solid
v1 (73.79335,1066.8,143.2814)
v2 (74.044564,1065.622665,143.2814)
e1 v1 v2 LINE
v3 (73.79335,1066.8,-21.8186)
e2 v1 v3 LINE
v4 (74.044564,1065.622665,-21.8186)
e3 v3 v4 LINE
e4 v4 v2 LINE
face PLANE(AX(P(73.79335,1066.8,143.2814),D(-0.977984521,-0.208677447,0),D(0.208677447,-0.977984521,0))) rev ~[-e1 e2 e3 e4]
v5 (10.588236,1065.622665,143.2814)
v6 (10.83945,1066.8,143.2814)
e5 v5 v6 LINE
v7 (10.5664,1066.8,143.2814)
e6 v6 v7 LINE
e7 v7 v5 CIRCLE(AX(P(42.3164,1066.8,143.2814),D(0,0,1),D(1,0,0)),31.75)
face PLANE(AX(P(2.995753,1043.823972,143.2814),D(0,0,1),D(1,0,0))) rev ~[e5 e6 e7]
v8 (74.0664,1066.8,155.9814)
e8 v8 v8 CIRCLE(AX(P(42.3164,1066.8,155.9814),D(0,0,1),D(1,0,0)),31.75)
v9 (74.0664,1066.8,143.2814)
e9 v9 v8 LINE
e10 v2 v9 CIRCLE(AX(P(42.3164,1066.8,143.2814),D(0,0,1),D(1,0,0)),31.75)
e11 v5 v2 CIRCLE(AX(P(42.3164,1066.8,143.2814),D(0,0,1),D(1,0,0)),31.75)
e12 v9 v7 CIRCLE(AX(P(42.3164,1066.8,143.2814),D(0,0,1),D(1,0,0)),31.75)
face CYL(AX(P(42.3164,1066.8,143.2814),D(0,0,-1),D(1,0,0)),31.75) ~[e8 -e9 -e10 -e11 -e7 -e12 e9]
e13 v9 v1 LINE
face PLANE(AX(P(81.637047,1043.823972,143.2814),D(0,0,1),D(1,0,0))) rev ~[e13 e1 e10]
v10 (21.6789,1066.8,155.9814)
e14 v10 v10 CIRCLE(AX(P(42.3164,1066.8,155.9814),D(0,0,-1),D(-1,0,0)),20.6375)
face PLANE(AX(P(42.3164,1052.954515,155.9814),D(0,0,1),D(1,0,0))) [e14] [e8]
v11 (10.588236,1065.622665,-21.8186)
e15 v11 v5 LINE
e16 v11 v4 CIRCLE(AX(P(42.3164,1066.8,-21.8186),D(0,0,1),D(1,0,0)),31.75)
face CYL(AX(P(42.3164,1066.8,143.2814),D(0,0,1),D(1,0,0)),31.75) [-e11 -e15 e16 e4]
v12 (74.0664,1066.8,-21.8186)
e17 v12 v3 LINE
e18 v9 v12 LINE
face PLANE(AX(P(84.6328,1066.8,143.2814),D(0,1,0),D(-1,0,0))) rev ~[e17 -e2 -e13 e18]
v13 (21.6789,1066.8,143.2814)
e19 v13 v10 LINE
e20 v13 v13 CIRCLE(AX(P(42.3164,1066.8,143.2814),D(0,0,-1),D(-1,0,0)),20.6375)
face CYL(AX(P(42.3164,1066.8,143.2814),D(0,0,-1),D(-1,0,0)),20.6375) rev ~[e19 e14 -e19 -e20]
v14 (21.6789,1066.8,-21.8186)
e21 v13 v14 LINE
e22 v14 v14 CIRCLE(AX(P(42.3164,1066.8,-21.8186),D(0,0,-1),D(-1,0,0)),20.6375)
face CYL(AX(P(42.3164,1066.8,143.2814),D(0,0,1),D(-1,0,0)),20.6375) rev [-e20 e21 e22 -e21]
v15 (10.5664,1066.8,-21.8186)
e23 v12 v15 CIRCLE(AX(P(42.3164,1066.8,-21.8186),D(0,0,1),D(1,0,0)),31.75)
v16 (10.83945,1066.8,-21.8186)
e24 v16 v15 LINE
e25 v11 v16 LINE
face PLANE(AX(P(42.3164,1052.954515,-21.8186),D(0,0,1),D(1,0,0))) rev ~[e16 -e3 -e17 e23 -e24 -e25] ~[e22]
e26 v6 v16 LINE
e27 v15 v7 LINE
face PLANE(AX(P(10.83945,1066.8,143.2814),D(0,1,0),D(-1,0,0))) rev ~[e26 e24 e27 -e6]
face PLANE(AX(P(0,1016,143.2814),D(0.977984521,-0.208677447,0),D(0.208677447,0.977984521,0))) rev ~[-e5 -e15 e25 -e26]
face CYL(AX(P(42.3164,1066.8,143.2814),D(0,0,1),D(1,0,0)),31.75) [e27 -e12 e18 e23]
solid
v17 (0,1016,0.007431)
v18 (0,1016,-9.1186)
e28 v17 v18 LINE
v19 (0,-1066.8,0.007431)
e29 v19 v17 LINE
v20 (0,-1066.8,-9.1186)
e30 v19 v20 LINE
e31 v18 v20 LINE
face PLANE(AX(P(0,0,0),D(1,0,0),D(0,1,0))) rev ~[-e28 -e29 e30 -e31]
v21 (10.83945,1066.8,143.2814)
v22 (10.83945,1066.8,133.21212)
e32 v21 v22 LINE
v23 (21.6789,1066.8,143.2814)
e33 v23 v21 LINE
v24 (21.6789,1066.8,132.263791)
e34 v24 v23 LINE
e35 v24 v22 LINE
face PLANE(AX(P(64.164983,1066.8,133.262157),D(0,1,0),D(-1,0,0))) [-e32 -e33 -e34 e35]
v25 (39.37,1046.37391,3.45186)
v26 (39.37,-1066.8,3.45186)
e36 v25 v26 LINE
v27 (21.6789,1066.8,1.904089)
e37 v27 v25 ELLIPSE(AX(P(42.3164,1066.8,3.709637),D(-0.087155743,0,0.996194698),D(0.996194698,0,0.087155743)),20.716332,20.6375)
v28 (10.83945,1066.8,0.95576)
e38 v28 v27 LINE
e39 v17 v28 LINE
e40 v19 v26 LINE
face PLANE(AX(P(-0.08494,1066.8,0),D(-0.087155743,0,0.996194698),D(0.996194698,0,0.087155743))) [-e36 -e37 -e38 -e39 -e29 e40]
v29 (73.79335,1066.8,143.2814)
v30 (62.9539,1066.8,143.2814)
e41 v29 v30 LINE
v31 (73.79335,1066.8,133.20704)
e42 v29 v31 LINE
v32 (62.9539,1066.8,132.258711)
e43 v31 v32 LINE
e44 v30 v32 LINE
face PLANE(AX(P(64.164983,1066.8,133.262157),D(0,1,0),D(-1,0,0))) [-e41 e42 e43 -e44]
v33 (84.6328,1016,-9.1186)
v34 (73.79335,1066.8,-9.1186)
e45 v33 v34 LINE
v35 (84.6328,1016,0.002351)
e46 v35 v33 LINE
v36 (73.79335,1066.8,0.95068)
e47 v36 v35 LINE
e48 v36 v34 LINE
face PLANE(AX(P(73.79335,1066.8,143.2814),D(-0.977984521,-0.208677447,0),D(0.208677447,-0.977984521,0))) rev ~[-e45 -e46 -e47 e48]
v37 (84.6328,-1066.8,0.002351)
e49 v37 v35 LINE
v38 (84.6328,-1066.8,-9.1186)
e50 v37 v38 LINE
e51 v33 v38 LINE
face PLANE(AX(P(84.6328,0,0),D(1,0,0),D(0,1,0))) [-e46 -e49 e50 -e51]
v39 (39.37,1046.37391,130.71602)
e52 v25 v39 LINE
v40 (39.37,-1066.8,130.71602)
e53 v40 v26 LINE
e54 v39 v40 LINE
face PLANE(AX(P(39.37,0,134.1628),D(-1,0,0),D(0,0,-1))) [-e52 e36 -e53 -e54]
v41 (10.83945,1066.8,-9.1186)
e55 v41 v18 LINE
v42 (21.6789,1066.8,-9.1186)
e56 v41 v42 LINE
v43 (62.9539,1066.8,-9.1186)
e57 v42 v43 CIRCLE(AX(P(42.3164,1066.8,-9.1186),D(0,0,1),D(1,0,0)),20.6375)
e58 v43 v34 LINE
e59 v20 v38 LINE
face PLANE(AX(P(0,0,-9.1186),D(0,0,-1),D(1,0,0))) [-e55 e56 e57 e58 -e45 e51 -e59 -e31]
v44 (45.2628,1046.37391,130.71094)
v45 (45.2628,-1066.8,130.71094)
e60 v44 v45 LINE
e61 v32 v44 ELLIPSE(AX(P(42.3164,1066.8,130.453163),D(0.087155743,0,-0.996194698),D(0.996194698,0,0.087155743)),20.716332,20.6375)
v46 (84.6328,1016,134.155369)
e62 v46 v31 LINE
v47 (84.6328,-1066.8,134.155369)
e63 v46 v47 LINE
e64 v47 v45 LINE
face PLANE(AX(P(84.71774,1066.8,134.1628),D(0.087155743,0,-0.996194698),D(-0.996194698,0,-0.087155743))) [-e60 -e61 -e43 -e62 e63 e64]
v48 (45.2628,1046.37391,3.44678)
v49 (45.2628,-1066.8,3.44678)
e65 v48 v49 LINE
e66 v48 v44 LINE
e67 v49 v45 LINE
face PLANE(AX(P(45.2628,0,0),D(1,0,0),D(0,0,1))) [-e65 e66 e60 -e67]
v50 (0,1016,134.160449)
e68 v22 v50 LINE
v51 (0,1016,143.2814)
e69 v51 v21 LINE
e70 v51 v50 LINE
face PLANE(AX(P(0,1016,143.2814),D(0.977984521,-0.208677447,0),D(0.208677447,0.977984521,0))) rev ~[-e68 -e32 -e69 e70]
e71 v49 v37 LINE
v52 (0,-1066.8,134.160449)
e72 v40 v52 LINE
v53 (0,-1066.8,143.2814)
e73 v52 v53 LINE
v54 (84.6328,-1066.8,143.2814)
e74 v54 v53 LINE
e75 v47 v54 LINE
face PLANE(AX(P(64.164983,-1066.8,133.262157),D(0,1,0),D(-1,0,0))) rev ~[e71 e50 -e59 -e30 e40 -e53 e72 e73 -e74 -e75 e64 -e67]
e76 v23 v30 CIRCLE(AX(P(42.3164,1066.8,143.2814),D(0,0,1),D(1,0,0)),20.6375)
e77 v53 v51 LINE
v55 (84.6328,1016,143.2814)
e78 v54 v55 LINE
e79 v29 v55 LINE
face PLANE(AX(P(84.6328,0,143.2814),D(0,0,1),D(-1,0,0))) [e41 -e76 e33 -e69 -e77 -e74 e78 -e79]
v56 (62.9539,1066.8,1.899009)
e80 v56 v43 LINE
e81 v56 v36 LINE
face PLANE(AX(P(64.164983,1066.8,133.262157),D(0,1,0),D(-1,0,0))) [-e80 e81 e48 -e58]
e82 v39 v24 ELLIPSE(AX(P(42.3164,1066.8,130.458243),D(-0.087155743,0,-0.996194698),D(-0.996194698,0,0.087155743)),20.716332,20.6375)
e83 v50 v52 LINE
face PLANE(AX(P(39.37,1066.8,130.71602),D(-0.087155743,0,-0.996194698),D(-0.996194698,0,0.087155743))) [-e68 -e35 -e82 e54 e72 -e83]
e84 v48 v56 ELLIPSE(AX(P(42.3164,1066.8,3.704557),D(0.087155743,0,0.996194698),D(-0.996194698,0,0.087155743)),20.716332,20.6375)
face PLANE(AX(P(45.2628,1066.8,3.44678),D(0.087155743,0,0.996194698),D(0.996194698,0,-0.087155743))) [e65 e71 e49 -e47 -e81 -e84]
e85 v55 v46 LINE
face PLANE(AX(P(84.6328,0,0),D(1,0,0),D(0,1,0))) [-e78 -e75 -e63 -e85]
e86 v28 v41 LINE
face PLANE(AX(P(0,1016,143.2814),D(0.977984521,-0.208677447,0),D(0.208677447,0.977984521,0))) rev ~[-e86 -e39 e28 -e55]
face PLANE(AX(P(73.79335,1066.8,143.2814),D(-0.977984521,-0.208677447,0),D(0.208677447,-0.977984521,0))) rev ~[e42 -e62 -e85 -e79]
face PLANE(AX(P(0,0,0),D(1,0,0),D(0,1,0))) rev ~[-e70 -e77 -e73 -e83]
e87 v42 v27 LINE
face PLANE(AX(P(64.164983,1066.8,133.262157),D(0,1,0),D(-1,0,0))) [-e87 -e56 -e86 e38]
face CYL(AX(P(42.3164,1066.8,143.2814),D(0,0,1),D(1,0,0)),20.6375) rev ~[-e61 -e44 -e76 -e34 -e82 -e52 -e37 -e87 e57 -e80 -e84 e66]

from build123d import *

# Parameters (mm, degrees)
F1_DEPTH      = 1066.8
F2_T4_DEPTH   = 2133.6
F2_T9_DEPTH   = 2133.6
F3_T4_DEPTH   = 2133.6
F3_T9_DEPTH   = 2133.6
F5_DEPTH      = 165.1
F5_DEPTH_BACK = 12.7
F6_R          = 20.6375
F7_DEPTH      = 165.101
F9_DEPTH      = 165.101


# Not quite as in the source:
# - a fillet or chamfer that OpenCascade refuses, or shapes differently, is made with other operations: its cross-section is extruded or revolved along the edge and cut away or added


with BuildPart() as f1:
    # F0 (on Front) → F1 (new body, symmetric)
    with BuildSketch(Plane.XZ):
        Polygon((39.37, 143.2814), (0, 143.2814), (0, 134.1628), (39.37, 134.1628), (39.37, 0), (0, 0), (0, -9.1186), (84.6328, -9.1186), (84.6328, 0), (45.2628, 0), (45.2628, 134.1628), (84.6328, 134.1628), (84.6328, 143.2814), (45.2628, 143.2814), align=None)
    extrude(amount=F1_DEPTH, both=True)

    # F2: chamfer of 3.44678 x 39.3968756761 on 2 edges, made by hand


with BuildPart() as f2_tool2:
    # F2_s3 → F2_t4 (new body)
    with BuildSketch(Plane.XZ.offset(-1066.8)):
        Polygon((39.37, 130.71602), (-0.0268756761, 134.1628), (39.37, 134.1628), align=None)
    extrude(amount=F2_T4_DEPTH)

    split(bisect_by=Plane.YZ, keep=Keep.TOP)


with BuildPart() as f1_1:
    add(f1.part)

    # F2_t1: union F2_tool2
    add(f2_tool2.part)


with BuildPart() as f2_tool7:
    # F2_s8 → F2_t9 (new body)
    with BuildSketch(Plane.XZ.offset(-1066.8)):
        Polygon((45.2628, 3.44678), (84.6596756761, 0), (45.2628, 0), align=None)
    extrude(amount=F2_T9_DEPTH)

    split(bisect_by=Plane.YZ.offset(84.6328), keep=Keep.BOTTOM)


with BuildPart() as f1_2:
    add(f1_1.part)

    # F2_t6: union F2_tool7
    add(f2_tool7.part)

    # F3: chamfer of 3.45186 x 39.4549403418 on 2 edges, made by hand


with BuildPart() as f3_tool2:
    # F3_s3 → F3_t4 (new body)
    with BuildSketch(Plane.XZ.offset(-1066.8)):
        Polygon((-0.0849403418, 0), (39.37, 3.45186), (39.37, 0), align=None)
    extrude(amount=F3_T4_DEPTH)

    split(bisect_by=Plane.YZ, keep=Keep.TOP)


with BuildPart() as f1_3:
    add(f1_2.part)

    # F3_t1: union F3_tool2
    add(f3_tool2.part)


with BuildPart() as f3_tool7:
    # F3_s8 → F3_t9 (new body)
    with BuildSketch(Plane.XZ.offset(-1066.8)):
        Polygon((84.7177403418, 134.1628), (45.2628, 130.71094), (45.2628, 134.1628), align=None)
    extrude(amount=F3_T9_DEPTH)

    split(bisect_by=Plane.YZ.offset(84.6328), keep=Keep.BOTTOM)


with BuildPart() as f1_4:
    add(f1_3.part)

    # F3_t6: union F3_tool7
    add(f3_tool7.part)

    # F6 (on face) → F7 (cut, through all)
    with BuildSketch(Plane.XY.offset(143.2814)):
        with Locations((42.3164, 1066.8)):
            Circle(F6_R)
    extrude(amount=-F7_DEPTH, mode=Mode.SUBTRACT)


with BuildPart() as f5:
    # F4 (on face) → F5 (new body, two sides)
    with BuildSketch(Plane.XY.offset(143.2814)) as f5_sk:
        with BuildLine():
            ThreePointArc((10.5664, 1066.8), (42.3164, 1035.05), (74.0664, 1066.8))
            Line((74.0664, 1066.8), (62.9539, 1066.8))
            ThreePointArc((62.9539, 1066.8), (42.3164, 1046.1625), (21.6789, 1066.8))
            Line((21.6789, 1066.8), (10.5664, 1066.8))
        make_face()
        with BuildLine():
            Line((62.9539, 1066.8), (74.0664, 1066.8))
            ThreePointArc((74.0664, 1066.8), (42.3164, 1098.55), (10.5664, 1066.8))
            Line((10.5664, 1066.8), (21.6789, 1066.8))
            ThreePointArc((21.6789, 1066.8), (42.3164, 1087.4375), (62.9539, 1066.8))
        make_face()
    extrude(amount=-F5_DEPTH)
    extrude(f5_sk.sketch, amount=F5_DEPTH_BACK)


with BuildPart() as f9_tool:
    # F8 (on face) → F9 (new body, through all)
    with BuildSketch(Plane.XY.offset(143.2814)):
        Polygon((0, 1016), (10.83945, 1066.8), (0, 1066.8), align=None)
        Polygon((84.6328, 1016), (84.6328, 1066.8), (73.79335, 1066.8), align=None)
    extrude(amount=-F9_DEPTH)


with BuildPart() as f1_5:
    add(f1_4.part)

    # F9: cut by f9_tool
    add(f9_tool.part, mode=Mode.SUBTRACT)


with BuildPart() as f5_1:
    add(f5.part)

    # F9: cut by f9_tool
    add(f9_tool.part, mode=Mode.SUBTRACT)


solid = Compound([f1_5.part, f5_1.part])
